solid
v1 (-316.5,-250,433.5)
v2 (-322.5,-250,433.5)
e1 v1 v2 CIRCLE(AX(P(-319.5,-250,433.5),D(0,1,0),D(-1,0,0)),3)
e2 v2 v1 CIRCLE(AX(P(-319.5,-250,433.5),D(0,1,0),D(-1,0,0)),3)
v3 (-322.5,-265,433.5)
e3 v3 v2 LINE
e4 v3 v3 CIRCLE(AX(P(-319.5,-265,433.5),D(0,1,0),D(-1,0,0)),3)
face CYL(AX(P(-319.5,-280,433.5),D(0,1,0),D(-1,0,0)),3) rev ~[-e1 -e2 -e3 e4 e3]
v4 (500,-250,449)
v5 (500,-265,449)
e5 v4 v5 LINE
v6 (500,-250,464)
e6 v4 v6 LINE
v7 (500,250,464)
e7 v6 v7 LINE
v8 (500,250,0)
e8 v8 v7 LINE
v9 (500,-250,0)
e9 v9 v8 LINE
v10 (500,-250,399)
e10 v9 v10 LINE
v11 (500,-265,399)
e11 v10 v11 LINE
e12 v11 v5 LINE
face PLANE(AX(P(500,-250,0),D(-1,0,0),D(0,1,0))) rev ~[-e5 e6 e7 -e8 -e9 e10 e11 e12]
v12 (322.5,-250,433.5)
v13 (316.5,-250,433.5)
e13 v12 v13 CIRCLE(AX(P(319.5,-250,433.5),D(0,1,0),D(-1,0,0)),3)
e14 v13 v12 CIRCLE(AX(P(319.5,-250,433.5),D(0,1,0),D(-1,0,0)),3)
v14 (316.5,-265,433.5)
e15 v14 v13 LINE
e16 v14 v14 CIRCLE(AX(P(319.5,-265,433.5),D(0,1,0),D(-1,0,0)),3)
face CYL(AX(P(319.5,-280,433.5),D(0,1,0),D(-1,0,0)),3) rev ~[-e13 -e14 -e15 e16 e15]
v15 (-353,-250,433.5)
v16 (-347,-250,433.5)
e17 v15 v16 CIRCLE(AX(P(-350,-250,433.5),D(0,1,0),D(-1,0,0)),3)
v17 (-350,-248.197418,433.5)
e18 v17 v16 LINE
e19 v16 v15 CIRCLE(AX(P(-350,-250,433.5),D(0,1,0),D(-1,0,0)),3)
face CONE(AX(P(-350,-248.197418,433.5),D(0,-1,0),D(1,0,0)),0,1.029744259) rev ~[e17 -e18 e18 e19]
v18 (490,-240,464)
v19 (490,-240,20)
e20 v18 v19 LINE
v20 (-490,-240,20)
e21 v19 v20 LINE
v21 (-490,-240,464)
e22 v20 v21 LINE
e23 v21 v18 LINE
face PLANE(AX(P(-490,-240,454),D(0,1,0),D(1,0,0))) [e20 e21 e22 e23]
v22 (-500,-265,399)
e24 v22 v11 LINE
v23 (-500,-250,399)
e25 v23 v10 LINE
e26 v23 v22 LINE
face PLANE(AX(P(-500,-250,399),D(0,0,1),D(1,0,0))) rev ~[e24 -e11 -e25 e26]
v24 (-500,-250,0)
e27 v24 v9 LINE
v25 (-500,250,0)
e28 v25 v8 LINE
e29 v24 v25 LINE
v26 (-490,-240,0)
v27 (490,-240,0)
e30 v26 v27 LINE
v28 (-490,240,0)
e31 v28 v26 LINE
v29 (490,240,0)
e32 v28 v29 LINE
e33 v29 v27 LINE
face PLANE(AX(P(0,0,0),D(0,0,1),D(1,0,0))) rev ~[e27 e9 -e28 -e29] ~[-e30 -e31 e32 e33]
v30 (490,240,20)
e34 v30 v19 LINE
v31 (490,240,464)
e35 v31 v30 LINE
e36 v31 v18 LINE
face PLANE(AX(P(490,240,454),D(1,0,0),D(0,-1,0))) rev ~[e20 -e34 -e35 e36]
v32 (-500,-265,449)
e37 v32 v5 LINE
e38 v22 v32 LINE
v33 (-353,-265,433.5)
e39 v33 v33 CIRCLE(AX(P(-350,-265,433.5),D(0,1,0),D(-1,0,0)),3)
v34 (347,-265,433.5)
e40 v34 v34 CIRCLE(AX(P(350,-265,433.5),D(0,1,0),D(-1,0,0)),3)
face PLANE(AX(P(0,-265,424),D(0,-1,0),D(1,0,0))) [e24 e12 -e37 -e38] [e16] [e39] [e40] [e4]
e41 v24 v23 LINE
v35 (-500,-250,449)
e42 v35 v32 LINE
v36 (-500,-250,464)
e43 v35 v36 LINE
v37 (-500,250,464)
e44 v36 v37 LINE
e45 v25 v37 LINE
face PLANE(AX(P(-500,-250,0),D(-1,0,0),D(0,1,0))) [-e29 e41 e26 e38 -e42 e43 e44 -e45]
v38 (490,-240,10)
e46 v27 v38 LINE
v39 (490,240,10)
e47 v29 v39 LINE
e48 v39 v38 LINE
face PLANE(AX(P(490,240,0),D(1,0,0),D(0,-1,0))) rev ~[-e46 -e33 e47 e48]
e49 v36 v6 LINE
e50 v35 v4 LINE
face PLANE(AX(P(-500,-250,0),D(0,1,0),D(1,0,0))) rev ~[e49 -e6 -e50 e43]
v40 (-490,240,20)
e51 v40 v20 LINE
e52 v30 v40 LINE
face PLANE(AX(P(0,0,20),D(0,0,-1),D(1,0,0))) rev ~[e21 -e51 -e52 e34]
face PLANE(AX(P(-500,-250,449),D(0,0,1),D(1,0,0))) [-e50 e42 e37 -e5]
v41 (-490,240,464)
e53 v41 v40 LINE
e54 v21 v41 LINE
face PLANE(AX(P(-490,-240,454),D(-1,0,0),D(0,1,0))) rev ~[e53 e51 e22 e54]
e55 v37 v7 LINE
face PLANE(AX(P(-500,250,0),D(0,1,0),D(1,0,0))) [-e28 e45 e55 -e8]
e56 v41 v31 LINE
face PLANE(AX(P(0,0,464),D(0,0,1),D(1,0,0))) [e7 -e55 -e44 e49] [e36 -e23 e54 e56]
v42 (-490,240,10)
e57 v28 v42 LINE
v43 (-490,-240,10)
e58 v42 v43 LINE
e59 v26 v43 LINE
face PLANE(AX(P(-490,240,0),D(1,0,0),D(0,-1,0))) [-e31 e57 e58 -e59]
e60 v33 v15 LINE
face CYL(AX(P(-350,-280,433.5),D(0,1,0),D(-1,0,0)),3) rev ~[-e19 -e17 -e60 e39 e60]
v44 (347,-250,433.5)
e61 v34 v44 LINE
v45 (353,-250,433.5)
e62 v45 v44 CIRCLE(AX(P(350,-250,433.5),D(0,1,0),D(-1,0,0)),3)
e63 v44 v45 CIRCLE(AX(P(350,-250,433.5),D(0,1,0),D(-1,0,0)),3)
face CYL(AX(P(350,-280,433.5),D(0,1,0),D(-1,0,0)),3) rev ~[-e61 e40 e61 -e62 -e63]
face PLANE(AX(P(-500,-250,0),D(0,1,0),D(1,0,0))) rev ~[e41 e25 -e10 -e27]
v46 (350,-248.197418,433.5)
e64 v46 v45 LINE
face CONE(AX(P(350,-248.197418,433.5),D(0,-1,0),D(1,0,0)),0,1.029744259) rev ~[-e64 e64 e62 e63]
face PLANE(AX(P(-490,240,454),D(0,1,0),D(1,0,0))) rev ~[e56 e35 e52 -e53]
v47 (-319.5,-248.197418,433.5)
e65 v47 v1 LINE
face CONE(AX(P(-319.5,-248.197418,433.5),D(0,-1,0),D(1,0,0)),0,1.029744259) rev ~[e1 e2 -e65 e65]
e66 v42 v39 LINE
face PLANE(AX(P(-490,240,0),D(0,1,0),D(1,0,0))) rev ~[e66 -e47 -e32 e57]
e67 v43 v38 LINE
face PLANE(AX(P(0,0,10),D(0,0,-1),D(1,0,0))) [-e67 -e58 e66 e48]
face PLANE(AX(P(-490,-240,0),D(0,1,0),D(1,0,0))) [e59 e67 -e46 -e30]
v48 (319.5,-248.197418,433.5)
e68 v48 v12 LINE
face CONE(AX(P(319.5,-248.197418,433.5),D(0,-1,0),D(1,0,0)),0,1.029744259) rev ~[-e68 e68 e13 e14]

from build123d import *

# Parameters (mm, degrees)
F0_W     = 1000
F0_H     = 500
F1_DEPTH = 464
F2_W     = 980
F2_H     = 480
F3_DEPTH = 10
F4_T     = -10
F5_W     = 1000
F5_H     = 50
F6_DEPTH = 15
F8_D     = 6
F8_DEPTH = 15
F8_TIP   = 1.8025818571


# Not quite as in the source:
# - a shell that OpenCascade refuses in one call is made with other operations: the cavity is built on its own and cut out


with BuildPart() as f1:
    # F0 (on Top) → F1 (new body)
    with BuildSketch(Plane.XY):
        Rectangle(F0_W, F0_H)
    extrude(amount=F1_DEPTH)

    # F2 (on face) → F3 (cut)
    with BuildSketch(Plane(origin=(0, 0, 0), x_dir=(1, 0, 0), z_dir=(0, 0, -1))):
        Rectangle(F2_W, F2_H)
    extrude(amount=-F3_DEPTH, mode=Mode.SUBTRACT)

    # F4: a shell. OpenCascade refuses it in one call, so the cavity is built on its own and cut out:
    # the body offset inwards by the wall thickness, plus a prism from it out through each open face.
    f4_core = offset(f1.part, amount=F4_T, kind=Kind.INTERSECTION, mode=Mode.PRIVATE)
    f4_exits = [f4_core.faces().sort_by_distance(p)[0] for p in [
        (0, 0, 454),
    ]]
    add(f4_core, mode=Mode.SUBTRACT)
    extrude(f4_exits, amount=-F4_T, mode=Mode.SUBTRACT)

    # F5 (on face) → F6 (join)
    with BuildSketch(Plane.XZ.offset(250)):
        with Locations((0, 424)):
            Rectangle(F5_W, F5_H)
    extrude(amount=F6_DEPTH)

    # F8
    with Locations(Plane.XZ.offset(265)):
        with Locations((-350, 433.5), (-319.5, 433.5), (319.5, 433.5), (350, 433.5)):
            Hole(F8_D / 2, depth=F8_DEPTH)
            with Locations((0, 0, -(F8_DEPTH + F8_TIP / 2))):  # 118° drill point
                Cone(0, F8_D / 2, F8_TIP, mode=Mode.SUBTRACT)


solid = f1.part
